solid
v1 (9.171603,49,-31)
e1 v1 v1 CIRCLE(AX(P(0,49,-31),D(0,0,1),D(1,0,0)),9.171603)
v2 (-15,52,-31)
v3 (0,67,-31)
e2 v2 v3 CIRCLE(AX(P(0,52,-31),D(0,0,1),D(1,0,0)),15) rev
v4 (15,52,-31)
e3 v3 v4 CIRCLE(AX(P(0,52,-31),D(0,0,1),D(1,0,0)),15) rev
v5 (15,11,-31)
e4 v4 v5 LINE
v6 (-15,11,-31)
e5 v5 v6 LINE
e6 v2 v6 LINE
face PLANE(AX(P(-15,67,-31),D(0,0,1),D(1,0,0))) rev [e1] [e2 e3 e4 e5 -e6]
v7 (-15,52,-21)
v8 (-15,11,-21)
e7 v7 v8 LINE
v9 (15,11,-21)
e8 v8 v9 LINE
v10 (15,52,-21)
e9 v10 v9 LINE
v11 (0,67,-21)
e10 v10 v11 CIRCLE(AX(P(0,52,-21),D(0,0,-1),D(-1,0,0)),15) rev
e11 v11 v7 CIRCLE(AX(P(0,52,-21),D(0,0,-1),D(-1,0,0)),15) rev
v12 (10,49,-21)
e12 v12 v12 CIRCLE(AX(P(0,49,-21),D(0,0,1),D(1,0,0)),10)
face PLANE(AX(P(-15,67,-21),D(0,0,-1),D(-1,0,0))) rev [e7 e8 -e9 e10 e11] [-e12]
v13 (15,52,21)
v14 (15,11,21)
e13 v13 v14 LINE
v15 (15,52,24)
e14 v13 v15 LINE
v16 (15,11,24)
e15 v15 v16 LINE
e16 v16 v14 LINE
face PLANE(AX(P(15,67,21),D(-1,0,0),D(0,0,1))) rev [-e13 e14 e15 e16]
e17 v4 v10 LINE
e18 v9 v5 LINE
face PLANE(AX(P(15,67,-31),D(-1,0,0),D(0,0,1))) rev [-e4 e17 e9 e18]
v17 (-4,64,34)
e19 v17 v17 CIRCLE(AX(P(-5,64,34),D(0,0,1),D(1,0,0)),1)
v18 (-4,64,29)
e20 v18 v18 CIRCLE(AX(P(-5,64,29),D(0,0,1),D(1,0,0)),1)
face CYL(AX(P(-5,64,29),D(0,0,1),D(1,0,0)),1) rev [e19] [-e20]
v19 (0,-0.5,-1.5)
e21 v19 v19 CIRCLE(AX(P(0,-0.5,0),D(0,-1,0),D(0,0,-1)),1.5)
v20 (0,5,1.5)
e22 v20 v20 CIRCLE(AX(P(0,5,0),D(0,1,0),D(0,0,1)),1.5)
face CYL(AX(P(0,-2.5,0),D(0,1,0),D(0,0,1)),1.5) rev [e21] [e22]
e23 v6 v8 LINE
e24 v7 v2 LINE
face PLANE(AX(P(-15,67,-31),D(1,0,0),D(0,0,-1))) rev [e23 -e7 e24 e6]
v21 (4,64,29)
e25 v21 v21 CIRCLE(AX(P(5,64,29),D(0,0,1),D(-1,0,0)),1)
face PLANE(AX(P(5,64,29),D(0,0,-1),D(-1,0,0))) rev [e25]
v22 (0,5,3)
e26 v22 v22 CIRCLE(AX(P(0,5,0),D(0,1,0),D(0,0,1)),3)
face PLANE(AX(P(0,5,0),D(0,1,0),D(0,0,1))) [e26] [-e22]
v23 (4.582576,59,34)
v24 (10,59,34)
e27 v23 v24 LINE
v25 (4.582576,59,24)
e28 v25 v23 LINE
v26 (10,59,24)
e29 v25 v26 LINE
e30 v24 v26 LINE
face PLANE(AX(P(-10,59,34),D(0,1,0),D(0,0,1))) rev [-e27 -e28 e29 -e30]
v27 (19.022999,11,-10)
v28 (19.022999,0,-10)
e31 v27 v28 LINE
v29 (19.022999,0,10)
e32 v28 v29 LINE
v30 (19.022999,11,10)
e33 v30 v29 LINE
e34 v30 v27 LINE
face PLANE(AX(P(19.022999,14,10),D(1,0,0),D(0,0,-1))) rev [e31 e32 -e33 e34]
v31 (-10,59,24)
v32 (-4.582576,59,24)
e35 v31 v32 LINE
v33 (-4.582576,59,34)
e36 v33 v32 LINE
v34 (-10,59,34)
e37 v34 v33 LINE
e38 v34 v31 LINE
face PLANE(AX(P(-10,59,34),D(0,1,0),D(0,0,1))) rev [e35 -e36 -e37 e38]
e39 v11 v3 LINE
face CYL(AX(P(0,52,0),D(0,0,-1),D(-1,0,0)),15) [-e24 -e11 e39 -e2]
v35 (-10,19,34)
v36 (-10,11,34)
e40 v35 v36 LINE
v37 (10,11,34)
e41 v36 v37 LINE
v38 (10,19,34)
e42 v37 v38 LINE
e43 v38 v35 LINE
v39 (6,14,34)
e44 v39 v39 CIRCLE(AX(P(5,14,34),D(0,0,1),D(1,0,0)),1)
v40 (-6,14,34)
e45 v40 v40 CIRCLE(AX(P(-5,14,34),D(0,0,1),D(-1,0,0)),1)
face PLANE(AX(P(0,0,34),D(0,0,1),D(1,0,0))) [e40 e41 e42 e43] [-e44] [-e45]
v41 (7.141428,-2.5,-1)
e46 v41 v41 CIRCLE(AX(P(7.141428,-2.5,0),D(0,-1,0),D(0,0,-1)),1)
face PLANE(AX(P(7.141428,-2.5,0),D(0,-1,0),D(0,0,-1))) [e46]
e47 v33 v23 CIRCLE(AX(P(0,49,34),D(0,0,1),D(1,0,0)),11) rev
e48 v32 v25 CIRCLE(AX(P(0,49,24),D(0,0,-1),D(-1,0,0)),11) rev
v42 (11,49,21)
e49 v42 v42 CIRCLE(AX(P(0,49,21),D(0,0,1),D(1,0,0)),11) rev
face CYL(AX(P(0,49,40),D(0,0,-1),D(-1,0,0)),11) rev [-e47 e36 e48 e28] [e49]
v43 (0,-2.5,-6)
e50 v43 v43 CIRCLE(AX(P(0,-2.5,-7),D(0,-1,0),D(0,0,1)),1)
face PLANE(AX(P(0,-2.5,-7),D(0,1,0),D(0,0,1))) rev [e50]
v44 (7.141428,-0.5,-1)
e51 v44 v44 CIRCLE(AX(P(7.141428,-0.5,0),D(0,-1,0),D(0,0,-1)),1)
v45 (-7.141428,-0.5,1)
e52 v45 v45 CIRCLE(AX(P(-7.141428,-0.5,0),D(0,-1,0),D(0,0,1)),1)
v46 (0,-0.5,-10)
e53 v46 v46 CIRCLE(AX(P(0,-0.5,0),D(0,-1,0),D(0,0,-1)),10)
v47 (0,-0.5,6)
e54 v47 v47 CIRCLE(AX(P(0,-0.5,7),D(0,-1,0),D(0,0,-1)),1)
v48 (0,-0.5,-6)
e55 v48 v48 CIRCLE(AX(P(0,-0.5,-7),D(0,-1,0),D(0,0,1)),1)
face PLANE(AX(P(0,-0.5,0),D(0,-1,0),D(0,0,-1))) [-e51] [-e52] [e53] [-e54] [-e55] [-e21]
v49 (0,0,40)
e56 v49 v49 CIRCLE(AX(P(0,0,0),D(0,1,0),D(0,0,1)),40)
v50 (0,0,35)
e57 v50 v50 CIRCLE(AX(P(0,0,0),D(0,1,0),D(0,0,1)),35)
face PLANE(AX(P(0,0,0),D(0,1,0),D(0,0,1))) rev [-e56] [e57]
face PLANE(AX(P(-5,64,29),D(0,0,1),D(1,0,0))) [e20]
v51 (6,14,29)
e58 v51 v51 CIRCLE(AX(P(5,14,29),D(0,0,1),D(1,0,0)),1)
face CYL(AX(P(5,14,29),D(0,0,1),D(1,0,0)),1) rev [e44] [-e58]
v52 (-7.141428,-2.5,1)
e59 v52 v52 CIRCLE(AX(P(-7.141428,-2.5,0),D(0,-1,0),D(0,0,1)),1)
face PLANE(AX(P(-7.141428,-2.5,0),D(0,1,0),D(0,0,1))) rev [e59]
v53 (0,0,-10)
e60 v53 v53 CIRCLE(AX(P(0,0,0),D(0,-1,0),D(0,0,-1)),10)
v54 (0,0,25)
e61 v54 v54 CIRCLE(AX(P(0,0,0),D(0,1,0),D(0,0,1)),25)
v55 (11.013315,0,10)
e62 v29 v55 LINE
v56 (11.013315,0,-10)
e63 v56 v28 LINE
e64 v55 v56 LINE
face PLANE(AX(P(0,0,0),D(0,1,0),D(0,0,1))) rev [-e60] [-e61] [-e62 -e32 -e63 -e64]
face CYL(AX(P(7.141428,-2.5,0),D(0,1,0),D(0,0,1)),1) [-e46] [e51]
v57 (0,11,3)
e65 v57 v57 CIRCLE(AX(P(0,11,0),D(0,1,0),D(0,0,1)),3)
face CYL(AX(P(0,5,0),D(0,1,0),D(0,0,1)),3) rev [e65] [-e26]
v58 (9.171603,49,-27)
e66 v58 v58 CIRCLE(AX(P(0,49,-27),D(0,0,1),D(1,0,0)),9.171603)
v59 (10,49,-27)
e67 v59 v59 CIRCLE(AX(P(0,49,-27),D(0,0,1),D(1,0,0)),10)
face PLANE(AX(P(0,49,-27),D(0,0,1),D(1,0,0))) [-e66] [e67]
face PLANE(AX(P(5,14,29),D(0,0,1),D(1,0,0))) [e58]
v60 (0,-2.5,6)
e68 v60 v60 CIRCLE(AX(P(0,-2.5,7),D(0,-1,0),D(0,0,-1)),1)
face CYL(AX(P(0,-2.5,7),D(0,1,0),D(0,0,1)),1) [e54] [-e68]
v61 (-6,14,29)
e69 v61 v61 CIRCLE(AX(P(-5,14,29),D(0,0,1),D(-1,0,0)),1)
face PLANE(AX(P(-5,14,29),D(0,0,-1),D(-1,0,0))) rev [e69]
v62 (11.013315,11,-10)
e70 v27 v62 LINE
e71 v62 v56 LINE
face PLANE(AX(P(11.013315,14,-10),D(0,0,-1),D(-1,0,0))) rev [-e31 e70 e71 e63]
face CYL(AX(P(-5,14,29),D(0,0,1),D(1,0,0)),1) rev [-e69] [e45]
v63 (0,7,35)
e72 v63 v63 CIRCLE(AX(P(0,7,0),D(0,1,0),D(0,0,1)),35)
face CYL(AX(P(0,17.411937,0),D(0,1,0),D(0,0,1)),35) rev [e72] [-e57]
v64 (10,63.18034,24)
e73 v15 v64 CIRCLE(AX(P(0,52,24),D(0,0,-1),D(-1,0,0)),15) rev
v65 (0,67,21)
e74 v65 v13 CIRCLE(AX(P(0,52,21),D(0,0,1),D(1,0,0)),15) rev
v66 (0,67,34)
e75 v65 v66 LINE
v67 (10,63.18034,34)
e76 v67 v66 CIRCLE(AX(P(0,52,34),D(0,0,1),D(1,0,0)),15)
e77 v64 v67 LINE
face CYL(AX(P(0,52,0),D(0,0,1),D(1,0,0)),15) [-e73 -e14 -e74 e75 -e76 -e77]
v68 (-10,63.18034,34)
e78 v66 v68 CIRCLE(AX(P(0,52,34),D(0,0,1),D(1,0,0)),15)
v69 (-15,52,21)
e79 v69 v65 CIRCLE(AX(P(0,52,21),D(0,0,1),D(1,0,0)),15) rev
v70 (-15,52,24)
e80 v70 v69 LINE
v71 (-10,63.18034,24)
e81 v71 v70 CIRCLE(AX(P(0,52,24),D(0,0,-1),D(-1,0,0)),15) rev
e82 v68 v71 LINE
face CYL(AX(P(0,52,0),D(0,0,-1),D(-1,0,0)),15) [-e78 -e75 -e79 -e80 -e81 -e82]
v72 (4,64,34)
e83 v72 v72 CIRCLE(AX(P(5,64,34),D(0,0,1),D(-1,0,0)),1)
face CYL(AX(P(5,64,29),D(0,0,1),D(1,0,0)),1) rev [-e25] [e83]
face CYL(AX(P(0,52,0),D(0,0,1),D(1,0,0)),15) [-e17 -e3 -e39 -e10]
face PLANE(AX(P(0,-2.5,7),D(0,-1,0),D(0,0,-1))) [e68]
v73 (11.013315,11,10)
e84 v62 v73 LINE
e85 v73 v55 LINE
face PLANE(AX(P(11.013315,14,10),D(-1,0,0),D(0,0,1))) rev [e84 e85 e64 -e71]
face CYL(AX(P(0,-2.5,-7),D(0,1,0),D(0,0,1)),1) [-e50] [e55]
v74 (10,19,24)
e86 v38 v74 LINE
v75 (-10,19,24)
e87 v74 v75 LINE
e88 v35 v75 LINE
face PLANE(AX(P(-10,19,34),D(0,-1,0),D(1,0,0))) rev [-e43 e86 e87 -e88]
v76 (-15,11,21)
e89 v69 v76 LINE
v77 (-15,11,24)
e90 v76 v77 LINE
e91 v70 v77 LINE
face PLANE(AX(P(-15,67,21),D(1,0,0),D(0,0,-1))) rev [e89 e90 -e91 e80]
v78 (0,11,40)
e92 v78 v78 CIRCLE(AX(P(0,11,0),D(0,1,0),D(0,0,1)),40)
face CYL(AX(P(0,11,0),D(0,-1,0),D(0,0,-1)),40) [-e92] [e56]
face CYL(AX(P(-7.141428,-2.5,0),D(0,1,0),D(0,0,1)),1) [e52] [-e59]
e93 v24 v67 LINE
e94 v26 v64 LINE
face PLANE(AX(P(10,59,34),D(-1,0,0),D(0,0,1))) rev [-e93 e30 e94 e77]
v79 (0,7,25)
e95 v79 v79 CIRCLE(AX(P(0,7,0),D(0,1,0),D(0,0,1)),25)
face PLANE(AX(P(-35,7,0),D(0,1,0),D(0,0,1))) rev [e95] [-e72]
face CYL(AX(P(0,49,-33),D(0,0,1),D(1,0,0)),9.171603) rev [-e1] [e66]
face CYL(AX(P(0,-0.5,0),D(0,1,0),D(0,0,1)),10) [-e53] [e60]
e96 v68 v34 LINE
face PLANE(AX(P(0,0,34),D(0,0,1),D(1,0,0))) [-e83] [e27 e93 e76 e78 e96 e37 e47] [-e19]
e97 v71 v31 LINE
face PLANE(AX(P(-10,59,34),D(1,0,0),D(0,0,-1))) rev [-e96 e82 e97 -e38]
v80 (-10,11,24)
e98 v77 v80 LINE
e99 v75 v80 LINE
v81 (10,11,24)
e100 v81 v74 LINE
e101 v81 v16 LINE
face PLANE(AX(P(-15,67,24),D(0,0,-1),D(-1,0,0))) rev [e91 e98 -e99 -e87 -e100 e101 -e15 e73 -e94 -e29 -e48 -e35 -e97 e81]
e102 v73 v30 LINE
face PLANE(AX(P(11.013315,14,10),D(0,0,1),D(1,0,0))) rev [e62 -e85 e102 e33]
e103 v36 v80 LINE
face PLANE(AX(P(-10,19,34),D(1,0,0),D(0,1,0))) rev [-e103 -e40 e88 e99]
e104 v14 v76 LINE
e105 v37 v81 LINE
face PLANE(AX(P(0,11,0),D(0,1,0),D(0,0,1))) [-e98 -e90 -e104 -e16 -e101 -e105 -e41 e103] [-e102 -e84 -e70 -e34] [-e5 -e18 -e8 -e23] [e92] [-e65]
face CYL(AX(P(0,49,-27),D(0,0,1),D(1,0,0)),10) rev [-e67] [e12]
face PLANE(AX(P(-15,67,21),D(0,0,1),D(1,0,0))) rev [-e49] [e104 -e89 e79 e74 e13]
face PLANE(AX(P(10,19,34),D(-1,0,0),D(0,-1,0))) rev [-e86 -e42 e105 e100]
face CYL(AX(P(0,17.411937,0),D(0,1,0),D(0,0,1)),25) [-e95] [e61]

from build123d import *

# Parameters (mm, degrees)
SKETCH1_R               = 40
BOSS_EXTRUDE1_DEPTH     = 11
SKETCH3_W               = 10
SKETCH3_H               = 7
SKETCH5_R               = 3
CUT_EXTRUDE2_DEPTH      = 6
SKETCH6_W               = 30
SKETCH6_H               = 3
BOSS_EXTRUDE2_DEPTH     = 56
SKETCH7_W               = 20
SKETCH7_H               = 8
BOSS_EXTRUDE3_DEPTH     = 10
CUT_EXTRUDE4_DEPTH      = 101.920760996
CUT_EXTRUDE4_DEPTH_BACK = 5
SKETCH9_R               = 11
FILLET2_R               = 15
SKETCH13_R              = 10
BOSS_EXTRUDE4_DEPTH     = 0.5
SKETCH14_R              = 1
BOSS_EXTRUDE5_DEPTH     = 2
SKETCH4_R               = 1.5
CUT_EXTRUDE1_DEPTH      = 80.598994969
SKETCH15_W              = 30
SKETCH15_H              = 10
BOSS_EXTRUDE6_DEPTH     = 56
FILLET3_R               = 15
SKETCH16_R              = 1
CUT_EXTRUDE5_DEPTH      = 5
SKETCH20_R              = 10
CUT_EXTRUDE8_DEPTH      = 6
SKETCH22_R              = 9.171602893
CUT_EXTRUDE9_DEPTH      = 6
SKETCH23_W              = 8.009683582
SKETCH23_H              = 20
CUT_EXTRUDE10_DEPTH     = 14


with BuildPart() as part:
    # Sketch1 → Boss-Extrude1 (new body)
    with BuildSketch(Plane(origin=(0, 0, 0), x_dir=(1, 0, 0), z_dir=(0, 1, 0))):
        with Locations(Location((0, 0, 0), (0, 0, 270))):
            Circle(SKETCH1_R)
    extrude(amount=BOSS_EXTRUDE1_DEPTH)

    # Sketch3 → Cut-Revolve1 (revolve, cut)
    with BuildSketch(Plane.XY, mode=Mode.PRIVATE) as cut_revolve1_sk:
        with Locations((-30, 3.5)):
            Rectangle(SKETCH3_W, SKETCH3_H)
    revolve(cut_revolve1_sk.sketch.rotate(Axis((0, 17.41193703, 0), (0, -1, 0)), 270), axis=Axis((0, 17.41193703, 0), (0, -1, 0)), mode=Mode.SUBTRACT)

    # Sketch5 → Cut-Extrude2 (cut)
    with BuildSketch(Plane(origin=(0, 11, 0), x_dir=(1, 0, 0), z_dir=(0, 1, 0))):
        with Locations(Location((0, 0, 0), (0, 0, 270))):
            Circle(SKETCH5_R)
    extrude(amount=-CUT_EXTRUDE2_DEPTH, mode=Mode.SUBTRACT)

    # Sketch6 → Boss-Extrude2 (add)
    with BuildSketch(Plane(origin=(0, 11, 0), x_dir=(1, 0, 0), z_dir=(0, 1, 0))):
        with Locations((0, -22.5)):
            Rectangle(SKETCH6_W, SKETCH6_H)
    extrude(amount=BOSS_EXTRUDE2_DEPTH)

    # Sketch7 → Boss-Extrude3 (add)
    with BuildSketch(Plane.XY.offset(24)):
        with Locations((0, 15)):
            Rectangle(SKETCH7_W, SKETCH7_H)
        with Locations((0, 63)):
            Rectangle(SKETCH7_W, SKETCH7_H)
    extrude(amount=BOSS_EXTRUDE3_DEPTH)

    # Sketch9 → Cut-Extrude4 (cut, two sides: drawn at the far end of the back side and taken through both)
    with BuildSketch(Plane.XY.offset(24).offset(-CUT_EXTRUDE4_DEPTH_BACK)):
        with Locations(Location((0, 49, 0), (0, 0, 114.619977329))):
            Circle(SKETCH9_R)
    extrude(amount=CUT_EXTRUDE4_DEPTH + CUT_EXTRUDE4_DEPTH_BACK, mode=Mode.SUBTRACT)

    # Fillet2
    fillet2_edges = [part.edges().sort_by_distance(p)[0] for p in [
        (15, 67, 22.5),
        (-15, 67, 22.5),
    ]]
    fillet(fillet2_edges, radius=FILLET2_R - 0.0001)  # a hair under: the kernel refuses the full size

    # Sketch13 → Boss-Extrude4 (add)
    with BuildSketch(Plane.XZ):
        with Locations(Location((0, 0, 0), (0, 0, 270))):
            Circle(SKETCH13_R)
    extrude(amount=BOSS_EXTRUDE4_DEPTH)

    # Sketch14 → Boss-Extrude5 (add)
    with BuildSketch(Plane.XZ.offset(0.5)):
        with Locations(Location((0, 7, 0), (0, 0, 270))):
            Circle(SKETCH14_R)
        with Locations(Location((0, -7, 0), (0, 0, 90))):
            Circle(SKETCH14_R)
        with Locations(Location((7.141428429, 0, 0), (0, 0, 270))):
            Circle(SKETCH14_R)
        with Locations(Location((-7.141428429, 0, 0), (0, 0, 90))):
            Circle(SKETCH14_R)
    extrude(amount=BOSS_EXTRUDE5_DEPTH)

    # Sketch4 → Cut-Extrude1 (cut, through all)
    with BuildSketch(Plane(origin=(0, 11, 0), x_dir=(1, 0, 0), z_dir=(0, 1, 0))):
        with Locations(Location((0, 0, 0), (0, 0, 270))):
            Circle(SKETCH4_R)
    extrude(amount=-CUT_EXTRUDE1_DEPTH, mode=Mode.SUBTRACT)

    # Sketch15 → Boss-Extrude6 (add)
    with BuildSketch(Plane(origin=(0, 11, 0), x_dir=(1, 0, 0), z_dir=(0, 1, 0))):
        with Locations((0, 26)):
            Rectangle(SKETCH15_W, SKETCH15_H)
    extrude(amount=BOSS_EXTRUDE6_DEPTH)

    # Fillet3
    fillet3_edges = [part.edges().sort_by_distance(p)[0] for p in [
        (-15, 67, -26),
        (15, 67, -26),
    ]]
    fillet(fillet3_edges, radius=FILLET3_R - 0.0001)  # a hair under: the kernel refuses the full size

    # Sketch16 → Cut-Extrude5 (cut)
    with BuildSketch(Plane.XY.offset(34)):
        with Locations((-5, 64)):
            Circle(SKETCH16_R)
        with Locations(Location((5, 64, 0), (0, 0, 180))):
            Circle(SKETCH16_R)
        with Locations(Location((-5, 14, 0), (0, 0, 180))):
            Circle(SKETCH16_R)
        with Locations((5, 14)):
            Circle(SKETCH16_R)
    extrude(amount=-CUT_EXTRUDE5_DEPTH, mode=Mode.SUBTRACT)

    # Sketch20 → Cut-Extrude8 (cut)
    with BuildSketch(Plane.XY.offset(-21)):
        with Locations((0, 49)):
            Circle(SKETCH20_R)
    extrude(amount=-CUT_EXTRUDE8_DEPTH, mode=Mode.SUBTRACT)

    # Sketch22 → Cut-Extrude9 (cut)
    with BuildSketch(Plane.XY.offset(-27)):
        with Locations((0, 49)):
            Circle(SKETCH22_R)
    extrude(amount=-CUT_EXTRUDE9_DEPTH, mode=Mode.SUBTRACT)

    # Sketch23 → Cut-Extrude10 (cut)
    with BuildSketch(Plane.XZ):
        with Locations((15.018156717, 0)):
            Rectangle(SKETCH23_W, SKETCH23_H)
    extrude(amount=-CUT_EXTRUDE10_DEPTH, mode=Mode.SUBTRACT)


solid = part.part
